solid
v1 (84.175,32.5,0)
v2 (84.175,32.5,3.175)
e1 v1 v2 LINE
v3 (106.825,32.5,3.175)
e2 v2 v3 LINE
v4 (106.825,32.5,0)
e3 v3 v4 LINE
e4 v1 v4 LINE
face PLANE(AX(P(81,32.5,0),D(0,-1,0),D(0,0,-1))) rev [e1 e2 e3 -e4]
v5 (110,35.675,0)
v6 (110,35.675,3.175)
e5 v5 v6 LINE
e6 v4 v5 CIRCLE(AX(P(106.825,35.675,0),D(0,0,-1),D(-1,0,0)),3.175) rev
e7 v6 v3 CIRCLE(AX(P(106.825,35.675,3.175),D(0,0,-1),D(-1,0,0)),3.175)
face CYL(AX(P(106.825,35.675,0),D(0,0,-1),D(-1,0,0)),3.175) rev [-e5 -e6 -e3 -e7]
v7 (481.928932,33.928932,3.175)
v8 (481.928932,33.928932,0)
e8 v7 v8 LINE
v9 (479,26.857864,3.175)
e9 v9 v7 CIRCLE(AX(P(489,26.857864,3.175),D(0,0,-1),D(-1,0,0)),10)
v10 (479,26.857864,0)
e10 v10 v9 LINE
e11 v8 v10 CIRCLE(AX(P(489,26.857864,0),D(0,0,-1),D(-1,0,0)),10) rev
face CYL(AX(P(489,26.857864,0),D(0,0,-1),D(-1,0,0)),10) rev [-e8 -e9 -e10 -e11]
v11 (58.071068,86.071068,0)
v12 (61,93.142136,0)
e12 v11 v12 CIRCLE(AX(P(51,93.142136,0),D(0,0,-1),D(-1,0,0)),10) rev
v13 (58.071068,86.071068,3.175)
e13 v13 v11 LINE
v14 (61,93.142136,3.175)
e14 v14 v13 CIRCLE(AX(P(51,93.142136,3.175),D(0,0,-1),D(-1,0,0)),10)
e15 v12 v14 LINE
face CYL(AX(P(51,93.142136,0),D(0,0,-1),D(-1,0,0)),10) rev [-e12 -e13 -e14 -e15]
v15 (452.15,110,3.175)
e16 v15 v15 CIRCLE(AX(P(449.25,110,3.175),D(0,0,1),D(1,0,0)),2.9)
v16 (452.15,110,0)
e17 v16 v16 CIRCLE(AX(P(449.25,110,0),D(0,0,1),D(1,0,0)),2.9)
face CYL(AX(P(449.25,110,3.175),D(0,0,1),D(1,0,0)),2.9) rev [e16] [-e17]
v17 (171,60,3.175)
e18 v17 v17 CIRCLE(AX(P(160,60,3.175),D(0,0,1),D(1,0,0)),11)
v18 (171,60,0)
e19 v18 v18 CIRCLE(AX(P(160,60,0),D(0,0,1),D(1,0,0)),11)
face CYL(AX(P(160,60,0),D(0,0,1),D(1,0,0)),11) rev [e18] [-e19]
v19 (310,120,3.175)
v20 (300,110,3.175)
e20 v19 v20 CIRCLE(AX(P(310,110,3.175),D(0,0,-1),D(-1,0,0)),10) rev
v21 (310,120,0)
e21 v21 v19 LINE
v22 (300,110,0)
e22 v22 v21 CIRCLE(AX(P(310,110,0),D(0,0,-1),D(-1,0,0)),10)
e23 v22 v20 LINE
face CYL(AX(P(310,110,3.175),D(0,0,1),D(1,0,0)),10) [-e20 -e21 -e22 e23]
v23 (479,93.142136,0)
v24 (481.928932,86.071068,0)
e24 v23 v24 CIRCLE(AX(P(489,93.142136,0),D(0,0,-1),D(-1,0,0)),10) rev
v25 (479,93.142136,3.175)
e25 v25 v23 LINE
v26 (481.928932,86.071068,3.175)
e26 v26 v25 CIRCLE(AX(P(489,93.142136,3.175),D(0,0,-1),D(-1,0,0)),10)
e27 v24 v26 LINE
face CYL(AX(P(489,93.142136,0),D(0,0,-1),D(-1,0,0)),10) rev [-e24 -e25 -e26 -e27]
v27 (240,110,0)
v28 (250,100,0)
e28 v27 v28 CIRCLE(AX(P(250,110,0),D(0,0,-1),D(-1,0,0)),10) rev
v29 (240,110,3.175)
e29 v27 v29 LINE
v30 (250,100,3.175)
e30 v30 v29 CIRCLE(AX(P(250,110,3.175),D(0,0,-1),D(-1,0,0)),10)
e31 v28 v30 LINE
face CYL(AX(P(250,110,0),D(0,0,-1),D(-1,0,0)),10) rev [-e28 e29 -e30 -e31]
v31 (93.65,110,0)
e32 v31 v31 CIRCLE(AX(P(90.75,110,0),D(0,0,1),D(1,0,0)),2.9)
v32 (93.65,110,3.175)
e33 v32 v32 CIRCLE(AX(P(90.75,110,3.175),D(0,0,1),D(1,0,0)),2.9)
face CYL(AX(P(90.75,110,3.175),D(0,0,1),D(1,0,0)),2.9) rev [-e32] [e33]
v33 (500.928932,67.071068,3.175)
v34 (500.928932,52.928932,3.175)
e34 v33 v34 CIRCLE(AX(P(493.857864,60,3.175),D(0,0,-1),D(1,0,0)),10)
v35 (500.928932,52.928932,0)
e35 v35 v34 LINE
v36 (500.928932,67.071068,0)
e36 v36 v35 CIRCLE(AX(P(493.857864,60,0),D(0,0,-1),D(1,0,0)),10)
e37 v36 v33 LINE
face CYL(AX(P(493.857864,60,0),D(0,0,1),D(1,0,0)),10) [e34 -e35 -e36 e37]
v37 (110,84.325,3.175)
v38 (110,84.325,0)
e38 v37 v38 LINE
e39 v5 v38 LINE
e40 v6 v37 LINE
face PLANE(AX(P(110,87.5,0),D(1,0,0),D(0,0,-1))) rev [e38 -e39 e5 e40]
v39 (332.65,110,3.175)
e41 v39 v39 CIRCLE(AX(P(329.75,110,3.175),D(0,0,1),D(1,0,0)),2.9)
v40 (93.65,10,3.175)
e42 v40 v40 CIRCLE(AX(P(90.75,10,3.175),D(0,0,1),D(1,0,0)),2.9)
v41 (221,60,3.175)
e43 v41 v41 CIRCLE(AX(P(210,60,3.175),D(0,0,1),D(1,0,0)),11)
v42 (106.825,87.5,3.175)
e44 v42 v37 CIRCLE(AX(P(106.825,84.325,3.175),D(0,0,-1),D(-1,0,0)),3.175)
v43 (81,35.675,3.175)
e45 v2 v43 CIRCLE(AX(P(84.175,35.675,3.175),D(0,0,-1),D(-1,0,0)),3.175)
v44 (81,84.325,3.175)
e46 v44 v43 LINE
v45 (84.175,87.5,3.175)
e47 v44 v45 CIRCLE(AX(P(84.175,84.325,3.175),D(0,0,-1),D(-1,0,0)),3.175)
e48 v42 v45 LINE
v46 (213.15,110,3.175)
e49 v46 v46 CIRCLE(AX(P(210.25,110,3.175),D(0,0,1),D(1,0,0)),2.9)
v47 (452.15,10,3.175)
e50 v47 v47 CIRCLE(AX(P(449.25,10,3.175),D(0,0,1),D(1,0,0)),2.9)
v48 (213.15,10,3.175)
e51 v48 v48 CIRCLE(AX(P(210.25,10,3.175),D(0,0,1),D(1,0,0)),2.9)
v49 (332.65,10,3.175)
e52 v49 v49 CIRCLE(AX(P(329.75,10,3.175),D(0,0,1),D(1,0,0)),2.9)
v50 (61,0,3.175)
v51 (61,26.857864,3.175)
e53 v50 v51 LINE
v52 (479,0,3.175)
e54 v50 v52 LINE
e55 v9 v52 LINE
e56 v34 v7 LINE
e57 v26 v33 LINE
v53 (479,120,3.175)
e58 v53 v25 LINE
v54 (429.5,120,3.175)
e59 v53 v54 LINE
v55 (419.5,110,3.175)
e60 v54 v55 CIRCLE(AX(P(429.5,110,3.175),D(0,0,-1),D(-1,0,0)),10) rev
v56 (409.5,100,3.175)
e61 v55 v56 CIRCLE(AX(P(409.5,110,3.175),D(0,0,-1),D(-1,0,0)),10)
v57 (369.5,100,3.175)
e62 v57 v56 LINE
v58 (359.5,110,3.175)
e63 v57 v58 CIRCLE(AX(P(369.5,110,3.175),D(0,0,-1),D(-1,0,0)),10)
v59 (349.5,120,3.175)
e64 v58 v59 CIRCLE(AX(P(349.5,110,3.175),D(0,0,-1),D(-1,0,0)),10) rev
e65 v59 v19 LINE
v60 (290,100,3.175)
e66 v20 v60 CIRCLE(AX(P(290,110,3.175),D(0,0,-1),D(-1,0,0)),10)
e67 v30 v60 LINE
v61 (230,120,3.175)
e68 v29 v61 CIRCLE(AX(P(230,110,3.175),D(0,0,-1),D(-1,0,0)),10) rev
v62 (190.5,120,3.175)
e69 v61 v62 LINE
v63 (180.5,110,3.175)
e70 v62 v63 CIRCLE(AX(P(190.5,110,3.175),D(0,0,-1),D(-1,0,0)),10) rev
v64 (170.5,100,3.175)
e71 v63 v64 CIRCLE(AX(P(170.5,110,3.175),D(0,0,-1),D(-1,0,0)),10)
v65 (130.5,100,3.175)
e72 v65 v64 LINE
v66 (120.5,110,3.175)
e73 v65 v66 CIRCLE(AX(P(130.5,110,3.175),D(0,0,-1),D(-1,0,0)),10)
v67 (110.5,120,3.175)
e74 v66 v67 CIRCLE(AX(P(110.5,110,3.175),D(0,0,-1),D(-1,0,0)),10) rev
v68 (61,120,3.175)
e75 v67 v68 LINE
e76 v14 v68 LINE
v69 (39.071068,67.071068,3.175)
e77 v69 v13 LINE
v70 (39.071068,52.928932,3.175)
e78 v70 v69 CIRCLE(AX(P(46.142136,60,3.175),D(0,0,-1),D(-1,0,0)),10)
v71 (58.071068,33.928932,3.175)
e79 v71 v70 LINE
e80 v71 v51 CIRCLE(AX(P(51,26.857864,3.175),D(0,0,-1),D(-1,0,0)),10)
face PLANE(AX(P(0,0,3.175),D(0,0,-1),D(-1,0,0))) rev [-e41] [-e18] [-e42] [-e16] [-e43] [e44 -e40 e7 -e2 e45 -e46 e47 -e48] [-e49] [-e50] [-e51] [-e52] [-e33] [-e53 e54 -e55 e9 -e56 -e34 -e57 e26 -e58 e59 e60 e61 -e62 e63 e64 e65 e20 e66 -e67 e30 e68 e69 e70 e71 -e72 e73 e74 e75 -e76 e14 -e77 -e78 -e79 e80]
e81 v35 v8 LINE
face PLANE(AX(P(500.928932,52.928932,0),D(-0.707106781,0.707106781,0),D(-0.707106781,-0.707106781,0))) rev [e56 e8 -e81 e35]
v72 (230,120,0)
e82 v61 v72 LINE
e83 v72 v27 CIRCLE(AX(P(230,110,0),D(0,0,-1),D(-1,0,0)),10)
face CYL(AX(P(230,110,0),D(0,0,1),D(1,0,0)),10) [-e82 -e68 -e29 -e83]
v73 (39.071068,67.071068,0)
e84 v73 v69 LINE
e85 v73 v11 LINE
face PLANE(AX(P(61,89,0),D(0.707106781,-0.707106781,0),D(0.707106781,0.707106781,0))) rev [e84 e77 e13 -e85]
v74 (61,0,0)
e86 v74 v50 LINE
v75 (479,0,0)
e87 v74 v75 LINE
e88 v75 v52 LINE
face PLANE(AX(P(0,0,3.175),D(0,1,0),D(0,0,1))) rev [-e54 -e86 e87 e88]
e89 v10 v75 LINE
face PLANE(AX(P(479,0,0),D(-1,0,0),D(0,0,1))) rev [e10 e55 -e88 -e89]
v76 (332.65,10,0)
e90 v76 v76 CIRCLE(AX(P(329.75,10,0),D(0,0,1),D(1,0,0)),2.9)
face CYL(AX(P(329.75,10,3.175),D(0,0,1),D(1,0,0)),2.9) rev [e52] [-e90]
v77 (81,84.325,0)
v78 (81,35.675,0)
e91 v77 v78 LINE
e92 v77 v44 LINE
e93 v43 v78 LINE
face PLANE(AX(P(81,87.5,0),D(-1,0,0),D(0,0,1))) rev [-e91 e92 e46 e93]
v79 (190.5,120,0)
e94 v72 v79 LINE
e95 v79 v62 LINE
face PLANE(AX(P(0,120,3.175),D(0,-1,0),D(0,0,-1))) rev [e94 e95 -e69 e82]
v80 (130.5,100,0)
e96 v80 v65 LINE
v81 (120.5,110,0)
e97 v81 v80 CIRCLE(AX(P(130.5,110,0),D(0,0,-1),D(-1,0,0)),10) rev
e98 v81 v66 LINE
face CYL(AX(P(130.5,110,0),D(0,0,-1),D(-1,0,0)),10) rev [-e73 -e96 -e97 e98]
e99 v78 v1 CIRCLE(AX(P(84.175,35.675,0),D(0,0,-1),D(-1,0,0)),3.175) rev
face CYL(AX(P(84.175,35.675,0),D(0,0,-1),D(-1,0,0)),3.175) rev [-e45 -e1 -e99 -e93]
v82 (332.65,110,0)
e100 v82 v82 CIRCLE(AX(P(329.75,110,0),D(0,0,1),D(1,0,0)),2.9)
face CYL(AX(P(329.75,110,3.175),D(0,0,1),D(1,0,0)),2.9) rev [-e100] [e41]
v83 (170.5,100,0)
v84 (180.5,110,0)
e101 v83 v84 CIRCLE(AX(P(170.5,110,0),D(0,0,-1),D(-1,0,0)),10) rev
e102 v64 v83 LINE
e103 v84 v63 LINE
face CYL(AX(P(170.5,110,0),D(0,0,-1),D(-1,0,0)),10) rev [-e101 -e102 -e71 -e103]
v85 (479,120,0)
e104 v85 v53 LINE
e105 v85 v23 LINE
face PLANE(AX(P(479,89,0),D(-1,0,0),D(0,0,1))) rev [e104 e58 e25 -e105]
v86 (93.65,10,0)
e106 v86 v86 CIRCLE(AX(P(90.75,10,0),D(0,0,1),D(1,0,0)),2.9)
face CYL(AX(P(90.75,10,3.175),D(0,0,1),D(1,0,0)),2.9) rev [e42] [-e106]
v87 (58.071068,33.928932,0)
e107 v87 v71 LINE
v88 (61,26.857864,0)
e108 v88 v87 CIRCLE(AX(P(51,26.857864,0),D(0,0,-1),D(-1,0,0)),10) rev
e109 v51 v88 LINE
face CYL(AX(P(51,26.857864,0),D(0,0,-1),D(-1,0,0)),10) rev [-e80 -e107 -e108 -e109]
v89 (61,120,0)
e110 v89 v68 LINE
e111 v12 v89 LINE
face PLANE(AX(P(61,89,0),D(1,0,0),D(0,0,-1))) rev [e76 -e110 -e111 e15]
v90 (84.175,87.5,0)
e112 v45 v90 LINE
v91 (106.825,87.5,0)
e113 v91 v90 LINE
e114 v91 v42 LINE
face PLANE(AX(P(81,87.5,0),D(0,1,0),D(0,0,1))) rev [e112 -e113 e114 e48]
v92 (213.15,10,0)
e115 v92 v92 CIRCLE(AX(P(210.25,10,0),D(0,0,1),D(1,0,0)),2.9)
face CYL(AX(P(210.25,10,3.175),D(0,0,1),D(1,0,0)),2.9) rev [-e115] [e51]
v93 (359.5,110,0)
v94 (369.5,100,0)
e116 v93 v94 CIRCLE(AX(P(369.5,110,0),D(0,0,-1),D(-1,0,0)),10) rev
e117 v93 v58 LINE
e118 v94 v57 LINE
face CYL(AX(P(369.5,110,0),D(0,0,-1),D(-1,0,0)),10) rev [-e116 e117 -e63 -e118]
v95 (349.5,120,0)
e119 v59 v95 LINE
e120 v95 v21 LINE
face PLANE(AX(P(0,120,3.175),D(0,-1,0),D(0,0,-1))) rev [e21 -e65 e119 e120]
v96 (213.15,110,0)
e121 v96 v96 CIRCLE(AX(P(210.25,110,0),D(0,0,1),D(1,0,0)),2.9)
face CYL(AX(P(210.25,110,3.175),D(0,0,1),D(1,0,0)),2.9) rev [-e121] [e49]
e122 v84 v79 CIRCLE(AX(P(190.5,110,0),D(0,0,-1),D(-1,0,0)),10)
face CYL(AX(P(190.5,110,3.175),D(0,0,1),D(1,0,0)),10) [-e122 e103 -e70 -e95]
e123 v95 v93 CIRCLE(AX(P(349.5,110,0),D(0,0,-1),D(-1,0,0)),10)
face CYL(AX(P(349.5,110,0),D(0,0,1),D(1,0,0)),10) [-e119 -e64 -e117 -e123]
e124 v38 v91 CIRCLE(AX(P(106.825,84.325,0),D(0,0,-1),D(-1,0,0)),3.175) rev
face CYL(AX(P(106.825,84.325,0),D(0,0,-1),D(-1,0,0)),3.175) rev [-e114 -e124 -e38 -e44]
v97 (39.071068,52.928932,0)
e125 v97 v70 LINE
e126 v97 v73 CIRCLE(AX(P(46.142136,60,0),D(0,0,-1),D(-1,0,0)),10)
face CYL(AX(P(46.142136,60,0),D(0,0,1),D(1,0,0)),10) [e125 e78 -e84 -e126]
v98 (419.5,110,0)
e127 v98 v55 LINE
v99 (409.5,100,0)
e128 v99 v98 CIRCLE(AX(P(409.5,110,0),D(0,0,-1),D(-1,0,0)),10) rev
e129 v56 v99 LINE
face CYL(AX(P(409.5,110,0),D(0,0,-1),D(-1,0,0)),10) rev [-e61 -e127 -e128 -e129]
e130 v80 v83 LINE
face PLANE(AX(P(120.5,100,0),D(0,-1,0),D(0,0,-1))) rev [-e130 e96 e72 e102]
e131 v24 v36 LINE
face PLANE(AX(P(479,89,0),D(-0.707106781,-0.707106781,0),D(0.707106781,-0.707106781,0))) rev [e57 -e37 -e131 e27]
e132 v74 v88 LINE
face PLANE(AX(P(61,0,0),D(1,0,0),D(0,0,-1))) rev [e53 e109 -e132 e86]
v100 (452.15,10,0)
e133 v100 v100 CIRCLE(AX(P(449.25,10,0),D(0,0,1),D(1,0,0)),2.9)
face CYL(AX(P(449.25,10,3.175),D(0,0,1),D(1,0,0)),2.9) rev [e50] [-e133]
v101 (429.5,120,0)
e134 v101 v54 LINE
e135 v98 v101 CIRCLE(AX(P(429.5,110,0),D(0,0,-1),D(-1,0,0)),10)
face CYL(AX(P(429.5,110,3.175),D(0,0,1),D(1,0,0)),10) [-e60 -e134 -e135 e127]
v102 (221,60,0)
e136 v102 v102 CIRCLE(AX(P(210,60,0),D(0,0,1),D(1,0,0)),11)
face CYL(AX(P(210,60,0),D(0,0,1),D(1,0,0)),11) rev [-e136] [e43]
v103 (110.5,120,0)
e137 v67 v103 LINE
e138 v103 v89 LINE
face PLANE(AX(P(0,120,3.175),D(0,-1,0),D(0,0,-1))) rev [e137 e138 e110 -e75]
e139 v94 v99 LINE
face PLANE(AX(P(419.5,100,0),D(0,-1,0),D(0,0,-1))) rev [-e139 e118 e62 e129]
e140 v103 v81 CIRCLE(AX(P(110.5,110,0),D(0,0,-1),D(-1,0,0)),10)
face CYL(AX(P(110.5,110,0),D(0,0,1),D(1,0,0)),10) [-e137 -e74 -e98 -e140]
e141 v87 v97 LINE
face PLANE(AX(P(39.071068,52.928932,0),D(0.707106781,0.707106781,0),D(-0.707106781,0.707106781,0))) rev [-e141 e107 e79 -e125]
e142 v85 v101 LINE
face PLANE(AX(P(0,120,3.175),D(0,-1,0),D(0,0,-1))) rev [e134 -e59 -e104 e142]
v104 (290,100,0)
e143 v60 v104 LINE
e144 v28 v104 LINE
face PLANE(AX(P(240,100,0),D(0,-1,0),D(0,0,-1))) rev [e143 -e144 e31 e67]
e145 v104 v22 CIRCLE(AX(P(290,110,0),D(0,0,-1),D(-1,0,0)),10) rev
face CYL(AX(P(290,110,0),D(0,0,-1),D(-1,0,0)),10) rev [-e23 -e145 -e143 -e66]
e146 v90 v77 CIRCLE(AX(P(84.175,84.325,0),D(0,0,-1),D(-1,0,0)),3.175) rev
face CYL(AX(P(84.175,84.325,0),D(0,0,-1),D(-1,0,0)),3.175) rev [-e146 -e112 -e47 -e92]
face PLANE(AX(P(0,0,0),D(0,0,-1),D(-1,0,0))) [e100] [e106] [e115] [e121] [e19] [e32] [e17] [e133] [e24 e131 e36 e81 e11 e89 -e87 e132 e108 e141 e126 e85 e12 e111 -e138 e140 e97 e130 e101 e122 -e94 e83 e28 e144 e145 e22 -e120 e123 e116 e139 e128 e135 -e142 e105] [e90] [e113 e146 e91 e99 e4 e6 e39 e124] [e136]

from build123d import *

# Parameters (mm, degrees)
SKETCH2_W            = 540
SKETCH2_H            = 120
BOSS_EXTRUDE1_DEPTH  = 3.175
SKETCH3_W            = 60
SKETCH3_H            = 20
CUT_EXTRUDE1_DEPTH   = 554.181779007
FILLET1_R            = 10
FILLET2_R            = 10
M5_CLEARANCE_HOLE1_D = 5.8
LPATTERN1_COUNT      = 4
LPATTERN1_PITCH      = 119.5
SKETCH6_R            = 11
SKETCH6_W            = 29
SKETCH6_H            = 55
CUT_EXTRUDE2_DEPTH   = 518.960257277
FILLET3_R            = 3.175


with BuildPart() as part:
    # Sketch2 → Boss-Extrude1 (new body)
    with BuildSketch(Plane.XY):
        with Locations((270, 60)):
            Rectangle(SKETCH2_W, SKETCH2_H)
    extrude(amount=BOSS_EXTRUDE1_DEPTH)

    # Sketch3 → Cut-Extrude1 (cut, through all)
    with BuildSketch(Plane.XY.offset(3.175)):
        with BuildLine():
            Line((0, 0), (61, 0))
            Line((61, 0), (61, 31))
            Line((61, 31), (39.071067812, 52.928932188))
            ThreePointArc((39.071067812, 52.928932188), (36.142135624, 60), (39.071067812, 67.071067812))
            Line((39.071067812, 67.071067812), (61, 89))
            Line((61, 89), (61, 120))
            Line((61, 120), (0, 120))
            Line((0, 120), (0, 0))
        make_face()
        with BuildLine():
            Line((479, 89), (479, 120))
            Line((479, 120), (540, 120))
            Line((540, 120), (540, 0))
            Line((540, 0), (479, 0))
            Line((479, 0), (479, 31))
            Line((479, 31), (500.928932188, 52.928932188))
            ThreePointArc((500.928932188, 52.928932188), (503.857864376, 60), (500.928932188, 67.071067812))
            Line((500.928932188, 67.071067812), (479, 89))
        make_face()
        with Locations((270, 110)):
            Rectangle(SKETCH3_W, SKETCH3_H)
        with Locations((150.5, 110)):
            Rectangle(SKETCH3_W, SKETCH3_H)
        with Locations((389.5, 110)):
            Rectangle(SKETCH3_W, SKETCH3_H)
    extrude(amount=-CUT_EXTRUDE1_DEPTH, mode=Mode.SUBTRACT)

    # Fillet1
    fillet1_edges = [part.edges().sort_by_distance(p)[0] for p in [
        (61, 89, 1.5875),
        (61, 31, 1.5875),
        (479, 31, 1.5875),
        (479, 89, 1.5875),
    ]]
    fillet(fillet1_edges, radius=FILLET1_R)

    # Fillet2
    fillet2_edges = [part.edges().sort_by_distance(p)[0] for p in [
        (419.5, 100, 1.5875),
        (359.5, 100, 1.5875),
        (300, 100, 1.5875),
        (240, 100, 1.5875),
        (180.5, 100, 1.5875),
        (120.5, 100, 1.5875),
    ]]
    fillet(fillet2_edges, radius=FILLET2_R)
    fillet2_2_edges = [part.edges().sort_by_distance(p)[0] for p in [
        (419.5, 120, 1.5875),
        (359.5, 120, 1.5875),
        (300, 120, 1.5875),
        (240, 120, 1.5875),
        (180.5, 120, 1.5875),
        (120.5, 120, 1.5875),
    ]]
    fillet(fillet2_2_edges, radius=FILLET2_R - 0.0001)  # a hair under: the kernel refuses the full size

    # M5 Clearance Hole1 (through all)
    with Locations(Plane(origin=(90.75, 10, 3.175), x_dir=(1, 0, 0), z_dir=(0, 0, 1))):
        with Locations((0, 0), (0, 100)):
            m5_clearance_hole1 = Hole(M5_CLEARANCE_HOLE1_D / 2)

    # LPattern1: M5 Clearance Hole1 ×4
    with Locations(*[(i * LPATTERN1_PITCH, 0, 0) for i in range(1, LPATTERN1_COUNT)]):
        add(m5_clearance_hole1, mode=Mode.SUBTRACT)

    # Sketch6 → Cut-Extrude2 (cut, through all)
    with BuildSketch(Plane.XY.offset(3.175)):
        with Locations((160, 60)):
            Circle(SKETCH6_R)
        with Locations((210, 60)):
            Circle(SKETCH6_R)
        with Locations((95.5, 60)):
            Rectangle(SKETCH6_W, SKETCH6_H)
    extrude(amount=-CUT_EXTRUDE2_DEPTH, mode=Mode.SUBTRACT)

    # Fillet3
    fillet3_edges = [part.edges().sort_by_distance(p)[0] for p in [
        (81, 32.5, 1.5875),
        (81, 87.5, 1.5875),
        (110, 87.5, 1.5875),
        (110, 32.5, 1.5875),
    ]]
    fillet(fillet3_edges, radius=FILLET3_R)


solid = part.part
